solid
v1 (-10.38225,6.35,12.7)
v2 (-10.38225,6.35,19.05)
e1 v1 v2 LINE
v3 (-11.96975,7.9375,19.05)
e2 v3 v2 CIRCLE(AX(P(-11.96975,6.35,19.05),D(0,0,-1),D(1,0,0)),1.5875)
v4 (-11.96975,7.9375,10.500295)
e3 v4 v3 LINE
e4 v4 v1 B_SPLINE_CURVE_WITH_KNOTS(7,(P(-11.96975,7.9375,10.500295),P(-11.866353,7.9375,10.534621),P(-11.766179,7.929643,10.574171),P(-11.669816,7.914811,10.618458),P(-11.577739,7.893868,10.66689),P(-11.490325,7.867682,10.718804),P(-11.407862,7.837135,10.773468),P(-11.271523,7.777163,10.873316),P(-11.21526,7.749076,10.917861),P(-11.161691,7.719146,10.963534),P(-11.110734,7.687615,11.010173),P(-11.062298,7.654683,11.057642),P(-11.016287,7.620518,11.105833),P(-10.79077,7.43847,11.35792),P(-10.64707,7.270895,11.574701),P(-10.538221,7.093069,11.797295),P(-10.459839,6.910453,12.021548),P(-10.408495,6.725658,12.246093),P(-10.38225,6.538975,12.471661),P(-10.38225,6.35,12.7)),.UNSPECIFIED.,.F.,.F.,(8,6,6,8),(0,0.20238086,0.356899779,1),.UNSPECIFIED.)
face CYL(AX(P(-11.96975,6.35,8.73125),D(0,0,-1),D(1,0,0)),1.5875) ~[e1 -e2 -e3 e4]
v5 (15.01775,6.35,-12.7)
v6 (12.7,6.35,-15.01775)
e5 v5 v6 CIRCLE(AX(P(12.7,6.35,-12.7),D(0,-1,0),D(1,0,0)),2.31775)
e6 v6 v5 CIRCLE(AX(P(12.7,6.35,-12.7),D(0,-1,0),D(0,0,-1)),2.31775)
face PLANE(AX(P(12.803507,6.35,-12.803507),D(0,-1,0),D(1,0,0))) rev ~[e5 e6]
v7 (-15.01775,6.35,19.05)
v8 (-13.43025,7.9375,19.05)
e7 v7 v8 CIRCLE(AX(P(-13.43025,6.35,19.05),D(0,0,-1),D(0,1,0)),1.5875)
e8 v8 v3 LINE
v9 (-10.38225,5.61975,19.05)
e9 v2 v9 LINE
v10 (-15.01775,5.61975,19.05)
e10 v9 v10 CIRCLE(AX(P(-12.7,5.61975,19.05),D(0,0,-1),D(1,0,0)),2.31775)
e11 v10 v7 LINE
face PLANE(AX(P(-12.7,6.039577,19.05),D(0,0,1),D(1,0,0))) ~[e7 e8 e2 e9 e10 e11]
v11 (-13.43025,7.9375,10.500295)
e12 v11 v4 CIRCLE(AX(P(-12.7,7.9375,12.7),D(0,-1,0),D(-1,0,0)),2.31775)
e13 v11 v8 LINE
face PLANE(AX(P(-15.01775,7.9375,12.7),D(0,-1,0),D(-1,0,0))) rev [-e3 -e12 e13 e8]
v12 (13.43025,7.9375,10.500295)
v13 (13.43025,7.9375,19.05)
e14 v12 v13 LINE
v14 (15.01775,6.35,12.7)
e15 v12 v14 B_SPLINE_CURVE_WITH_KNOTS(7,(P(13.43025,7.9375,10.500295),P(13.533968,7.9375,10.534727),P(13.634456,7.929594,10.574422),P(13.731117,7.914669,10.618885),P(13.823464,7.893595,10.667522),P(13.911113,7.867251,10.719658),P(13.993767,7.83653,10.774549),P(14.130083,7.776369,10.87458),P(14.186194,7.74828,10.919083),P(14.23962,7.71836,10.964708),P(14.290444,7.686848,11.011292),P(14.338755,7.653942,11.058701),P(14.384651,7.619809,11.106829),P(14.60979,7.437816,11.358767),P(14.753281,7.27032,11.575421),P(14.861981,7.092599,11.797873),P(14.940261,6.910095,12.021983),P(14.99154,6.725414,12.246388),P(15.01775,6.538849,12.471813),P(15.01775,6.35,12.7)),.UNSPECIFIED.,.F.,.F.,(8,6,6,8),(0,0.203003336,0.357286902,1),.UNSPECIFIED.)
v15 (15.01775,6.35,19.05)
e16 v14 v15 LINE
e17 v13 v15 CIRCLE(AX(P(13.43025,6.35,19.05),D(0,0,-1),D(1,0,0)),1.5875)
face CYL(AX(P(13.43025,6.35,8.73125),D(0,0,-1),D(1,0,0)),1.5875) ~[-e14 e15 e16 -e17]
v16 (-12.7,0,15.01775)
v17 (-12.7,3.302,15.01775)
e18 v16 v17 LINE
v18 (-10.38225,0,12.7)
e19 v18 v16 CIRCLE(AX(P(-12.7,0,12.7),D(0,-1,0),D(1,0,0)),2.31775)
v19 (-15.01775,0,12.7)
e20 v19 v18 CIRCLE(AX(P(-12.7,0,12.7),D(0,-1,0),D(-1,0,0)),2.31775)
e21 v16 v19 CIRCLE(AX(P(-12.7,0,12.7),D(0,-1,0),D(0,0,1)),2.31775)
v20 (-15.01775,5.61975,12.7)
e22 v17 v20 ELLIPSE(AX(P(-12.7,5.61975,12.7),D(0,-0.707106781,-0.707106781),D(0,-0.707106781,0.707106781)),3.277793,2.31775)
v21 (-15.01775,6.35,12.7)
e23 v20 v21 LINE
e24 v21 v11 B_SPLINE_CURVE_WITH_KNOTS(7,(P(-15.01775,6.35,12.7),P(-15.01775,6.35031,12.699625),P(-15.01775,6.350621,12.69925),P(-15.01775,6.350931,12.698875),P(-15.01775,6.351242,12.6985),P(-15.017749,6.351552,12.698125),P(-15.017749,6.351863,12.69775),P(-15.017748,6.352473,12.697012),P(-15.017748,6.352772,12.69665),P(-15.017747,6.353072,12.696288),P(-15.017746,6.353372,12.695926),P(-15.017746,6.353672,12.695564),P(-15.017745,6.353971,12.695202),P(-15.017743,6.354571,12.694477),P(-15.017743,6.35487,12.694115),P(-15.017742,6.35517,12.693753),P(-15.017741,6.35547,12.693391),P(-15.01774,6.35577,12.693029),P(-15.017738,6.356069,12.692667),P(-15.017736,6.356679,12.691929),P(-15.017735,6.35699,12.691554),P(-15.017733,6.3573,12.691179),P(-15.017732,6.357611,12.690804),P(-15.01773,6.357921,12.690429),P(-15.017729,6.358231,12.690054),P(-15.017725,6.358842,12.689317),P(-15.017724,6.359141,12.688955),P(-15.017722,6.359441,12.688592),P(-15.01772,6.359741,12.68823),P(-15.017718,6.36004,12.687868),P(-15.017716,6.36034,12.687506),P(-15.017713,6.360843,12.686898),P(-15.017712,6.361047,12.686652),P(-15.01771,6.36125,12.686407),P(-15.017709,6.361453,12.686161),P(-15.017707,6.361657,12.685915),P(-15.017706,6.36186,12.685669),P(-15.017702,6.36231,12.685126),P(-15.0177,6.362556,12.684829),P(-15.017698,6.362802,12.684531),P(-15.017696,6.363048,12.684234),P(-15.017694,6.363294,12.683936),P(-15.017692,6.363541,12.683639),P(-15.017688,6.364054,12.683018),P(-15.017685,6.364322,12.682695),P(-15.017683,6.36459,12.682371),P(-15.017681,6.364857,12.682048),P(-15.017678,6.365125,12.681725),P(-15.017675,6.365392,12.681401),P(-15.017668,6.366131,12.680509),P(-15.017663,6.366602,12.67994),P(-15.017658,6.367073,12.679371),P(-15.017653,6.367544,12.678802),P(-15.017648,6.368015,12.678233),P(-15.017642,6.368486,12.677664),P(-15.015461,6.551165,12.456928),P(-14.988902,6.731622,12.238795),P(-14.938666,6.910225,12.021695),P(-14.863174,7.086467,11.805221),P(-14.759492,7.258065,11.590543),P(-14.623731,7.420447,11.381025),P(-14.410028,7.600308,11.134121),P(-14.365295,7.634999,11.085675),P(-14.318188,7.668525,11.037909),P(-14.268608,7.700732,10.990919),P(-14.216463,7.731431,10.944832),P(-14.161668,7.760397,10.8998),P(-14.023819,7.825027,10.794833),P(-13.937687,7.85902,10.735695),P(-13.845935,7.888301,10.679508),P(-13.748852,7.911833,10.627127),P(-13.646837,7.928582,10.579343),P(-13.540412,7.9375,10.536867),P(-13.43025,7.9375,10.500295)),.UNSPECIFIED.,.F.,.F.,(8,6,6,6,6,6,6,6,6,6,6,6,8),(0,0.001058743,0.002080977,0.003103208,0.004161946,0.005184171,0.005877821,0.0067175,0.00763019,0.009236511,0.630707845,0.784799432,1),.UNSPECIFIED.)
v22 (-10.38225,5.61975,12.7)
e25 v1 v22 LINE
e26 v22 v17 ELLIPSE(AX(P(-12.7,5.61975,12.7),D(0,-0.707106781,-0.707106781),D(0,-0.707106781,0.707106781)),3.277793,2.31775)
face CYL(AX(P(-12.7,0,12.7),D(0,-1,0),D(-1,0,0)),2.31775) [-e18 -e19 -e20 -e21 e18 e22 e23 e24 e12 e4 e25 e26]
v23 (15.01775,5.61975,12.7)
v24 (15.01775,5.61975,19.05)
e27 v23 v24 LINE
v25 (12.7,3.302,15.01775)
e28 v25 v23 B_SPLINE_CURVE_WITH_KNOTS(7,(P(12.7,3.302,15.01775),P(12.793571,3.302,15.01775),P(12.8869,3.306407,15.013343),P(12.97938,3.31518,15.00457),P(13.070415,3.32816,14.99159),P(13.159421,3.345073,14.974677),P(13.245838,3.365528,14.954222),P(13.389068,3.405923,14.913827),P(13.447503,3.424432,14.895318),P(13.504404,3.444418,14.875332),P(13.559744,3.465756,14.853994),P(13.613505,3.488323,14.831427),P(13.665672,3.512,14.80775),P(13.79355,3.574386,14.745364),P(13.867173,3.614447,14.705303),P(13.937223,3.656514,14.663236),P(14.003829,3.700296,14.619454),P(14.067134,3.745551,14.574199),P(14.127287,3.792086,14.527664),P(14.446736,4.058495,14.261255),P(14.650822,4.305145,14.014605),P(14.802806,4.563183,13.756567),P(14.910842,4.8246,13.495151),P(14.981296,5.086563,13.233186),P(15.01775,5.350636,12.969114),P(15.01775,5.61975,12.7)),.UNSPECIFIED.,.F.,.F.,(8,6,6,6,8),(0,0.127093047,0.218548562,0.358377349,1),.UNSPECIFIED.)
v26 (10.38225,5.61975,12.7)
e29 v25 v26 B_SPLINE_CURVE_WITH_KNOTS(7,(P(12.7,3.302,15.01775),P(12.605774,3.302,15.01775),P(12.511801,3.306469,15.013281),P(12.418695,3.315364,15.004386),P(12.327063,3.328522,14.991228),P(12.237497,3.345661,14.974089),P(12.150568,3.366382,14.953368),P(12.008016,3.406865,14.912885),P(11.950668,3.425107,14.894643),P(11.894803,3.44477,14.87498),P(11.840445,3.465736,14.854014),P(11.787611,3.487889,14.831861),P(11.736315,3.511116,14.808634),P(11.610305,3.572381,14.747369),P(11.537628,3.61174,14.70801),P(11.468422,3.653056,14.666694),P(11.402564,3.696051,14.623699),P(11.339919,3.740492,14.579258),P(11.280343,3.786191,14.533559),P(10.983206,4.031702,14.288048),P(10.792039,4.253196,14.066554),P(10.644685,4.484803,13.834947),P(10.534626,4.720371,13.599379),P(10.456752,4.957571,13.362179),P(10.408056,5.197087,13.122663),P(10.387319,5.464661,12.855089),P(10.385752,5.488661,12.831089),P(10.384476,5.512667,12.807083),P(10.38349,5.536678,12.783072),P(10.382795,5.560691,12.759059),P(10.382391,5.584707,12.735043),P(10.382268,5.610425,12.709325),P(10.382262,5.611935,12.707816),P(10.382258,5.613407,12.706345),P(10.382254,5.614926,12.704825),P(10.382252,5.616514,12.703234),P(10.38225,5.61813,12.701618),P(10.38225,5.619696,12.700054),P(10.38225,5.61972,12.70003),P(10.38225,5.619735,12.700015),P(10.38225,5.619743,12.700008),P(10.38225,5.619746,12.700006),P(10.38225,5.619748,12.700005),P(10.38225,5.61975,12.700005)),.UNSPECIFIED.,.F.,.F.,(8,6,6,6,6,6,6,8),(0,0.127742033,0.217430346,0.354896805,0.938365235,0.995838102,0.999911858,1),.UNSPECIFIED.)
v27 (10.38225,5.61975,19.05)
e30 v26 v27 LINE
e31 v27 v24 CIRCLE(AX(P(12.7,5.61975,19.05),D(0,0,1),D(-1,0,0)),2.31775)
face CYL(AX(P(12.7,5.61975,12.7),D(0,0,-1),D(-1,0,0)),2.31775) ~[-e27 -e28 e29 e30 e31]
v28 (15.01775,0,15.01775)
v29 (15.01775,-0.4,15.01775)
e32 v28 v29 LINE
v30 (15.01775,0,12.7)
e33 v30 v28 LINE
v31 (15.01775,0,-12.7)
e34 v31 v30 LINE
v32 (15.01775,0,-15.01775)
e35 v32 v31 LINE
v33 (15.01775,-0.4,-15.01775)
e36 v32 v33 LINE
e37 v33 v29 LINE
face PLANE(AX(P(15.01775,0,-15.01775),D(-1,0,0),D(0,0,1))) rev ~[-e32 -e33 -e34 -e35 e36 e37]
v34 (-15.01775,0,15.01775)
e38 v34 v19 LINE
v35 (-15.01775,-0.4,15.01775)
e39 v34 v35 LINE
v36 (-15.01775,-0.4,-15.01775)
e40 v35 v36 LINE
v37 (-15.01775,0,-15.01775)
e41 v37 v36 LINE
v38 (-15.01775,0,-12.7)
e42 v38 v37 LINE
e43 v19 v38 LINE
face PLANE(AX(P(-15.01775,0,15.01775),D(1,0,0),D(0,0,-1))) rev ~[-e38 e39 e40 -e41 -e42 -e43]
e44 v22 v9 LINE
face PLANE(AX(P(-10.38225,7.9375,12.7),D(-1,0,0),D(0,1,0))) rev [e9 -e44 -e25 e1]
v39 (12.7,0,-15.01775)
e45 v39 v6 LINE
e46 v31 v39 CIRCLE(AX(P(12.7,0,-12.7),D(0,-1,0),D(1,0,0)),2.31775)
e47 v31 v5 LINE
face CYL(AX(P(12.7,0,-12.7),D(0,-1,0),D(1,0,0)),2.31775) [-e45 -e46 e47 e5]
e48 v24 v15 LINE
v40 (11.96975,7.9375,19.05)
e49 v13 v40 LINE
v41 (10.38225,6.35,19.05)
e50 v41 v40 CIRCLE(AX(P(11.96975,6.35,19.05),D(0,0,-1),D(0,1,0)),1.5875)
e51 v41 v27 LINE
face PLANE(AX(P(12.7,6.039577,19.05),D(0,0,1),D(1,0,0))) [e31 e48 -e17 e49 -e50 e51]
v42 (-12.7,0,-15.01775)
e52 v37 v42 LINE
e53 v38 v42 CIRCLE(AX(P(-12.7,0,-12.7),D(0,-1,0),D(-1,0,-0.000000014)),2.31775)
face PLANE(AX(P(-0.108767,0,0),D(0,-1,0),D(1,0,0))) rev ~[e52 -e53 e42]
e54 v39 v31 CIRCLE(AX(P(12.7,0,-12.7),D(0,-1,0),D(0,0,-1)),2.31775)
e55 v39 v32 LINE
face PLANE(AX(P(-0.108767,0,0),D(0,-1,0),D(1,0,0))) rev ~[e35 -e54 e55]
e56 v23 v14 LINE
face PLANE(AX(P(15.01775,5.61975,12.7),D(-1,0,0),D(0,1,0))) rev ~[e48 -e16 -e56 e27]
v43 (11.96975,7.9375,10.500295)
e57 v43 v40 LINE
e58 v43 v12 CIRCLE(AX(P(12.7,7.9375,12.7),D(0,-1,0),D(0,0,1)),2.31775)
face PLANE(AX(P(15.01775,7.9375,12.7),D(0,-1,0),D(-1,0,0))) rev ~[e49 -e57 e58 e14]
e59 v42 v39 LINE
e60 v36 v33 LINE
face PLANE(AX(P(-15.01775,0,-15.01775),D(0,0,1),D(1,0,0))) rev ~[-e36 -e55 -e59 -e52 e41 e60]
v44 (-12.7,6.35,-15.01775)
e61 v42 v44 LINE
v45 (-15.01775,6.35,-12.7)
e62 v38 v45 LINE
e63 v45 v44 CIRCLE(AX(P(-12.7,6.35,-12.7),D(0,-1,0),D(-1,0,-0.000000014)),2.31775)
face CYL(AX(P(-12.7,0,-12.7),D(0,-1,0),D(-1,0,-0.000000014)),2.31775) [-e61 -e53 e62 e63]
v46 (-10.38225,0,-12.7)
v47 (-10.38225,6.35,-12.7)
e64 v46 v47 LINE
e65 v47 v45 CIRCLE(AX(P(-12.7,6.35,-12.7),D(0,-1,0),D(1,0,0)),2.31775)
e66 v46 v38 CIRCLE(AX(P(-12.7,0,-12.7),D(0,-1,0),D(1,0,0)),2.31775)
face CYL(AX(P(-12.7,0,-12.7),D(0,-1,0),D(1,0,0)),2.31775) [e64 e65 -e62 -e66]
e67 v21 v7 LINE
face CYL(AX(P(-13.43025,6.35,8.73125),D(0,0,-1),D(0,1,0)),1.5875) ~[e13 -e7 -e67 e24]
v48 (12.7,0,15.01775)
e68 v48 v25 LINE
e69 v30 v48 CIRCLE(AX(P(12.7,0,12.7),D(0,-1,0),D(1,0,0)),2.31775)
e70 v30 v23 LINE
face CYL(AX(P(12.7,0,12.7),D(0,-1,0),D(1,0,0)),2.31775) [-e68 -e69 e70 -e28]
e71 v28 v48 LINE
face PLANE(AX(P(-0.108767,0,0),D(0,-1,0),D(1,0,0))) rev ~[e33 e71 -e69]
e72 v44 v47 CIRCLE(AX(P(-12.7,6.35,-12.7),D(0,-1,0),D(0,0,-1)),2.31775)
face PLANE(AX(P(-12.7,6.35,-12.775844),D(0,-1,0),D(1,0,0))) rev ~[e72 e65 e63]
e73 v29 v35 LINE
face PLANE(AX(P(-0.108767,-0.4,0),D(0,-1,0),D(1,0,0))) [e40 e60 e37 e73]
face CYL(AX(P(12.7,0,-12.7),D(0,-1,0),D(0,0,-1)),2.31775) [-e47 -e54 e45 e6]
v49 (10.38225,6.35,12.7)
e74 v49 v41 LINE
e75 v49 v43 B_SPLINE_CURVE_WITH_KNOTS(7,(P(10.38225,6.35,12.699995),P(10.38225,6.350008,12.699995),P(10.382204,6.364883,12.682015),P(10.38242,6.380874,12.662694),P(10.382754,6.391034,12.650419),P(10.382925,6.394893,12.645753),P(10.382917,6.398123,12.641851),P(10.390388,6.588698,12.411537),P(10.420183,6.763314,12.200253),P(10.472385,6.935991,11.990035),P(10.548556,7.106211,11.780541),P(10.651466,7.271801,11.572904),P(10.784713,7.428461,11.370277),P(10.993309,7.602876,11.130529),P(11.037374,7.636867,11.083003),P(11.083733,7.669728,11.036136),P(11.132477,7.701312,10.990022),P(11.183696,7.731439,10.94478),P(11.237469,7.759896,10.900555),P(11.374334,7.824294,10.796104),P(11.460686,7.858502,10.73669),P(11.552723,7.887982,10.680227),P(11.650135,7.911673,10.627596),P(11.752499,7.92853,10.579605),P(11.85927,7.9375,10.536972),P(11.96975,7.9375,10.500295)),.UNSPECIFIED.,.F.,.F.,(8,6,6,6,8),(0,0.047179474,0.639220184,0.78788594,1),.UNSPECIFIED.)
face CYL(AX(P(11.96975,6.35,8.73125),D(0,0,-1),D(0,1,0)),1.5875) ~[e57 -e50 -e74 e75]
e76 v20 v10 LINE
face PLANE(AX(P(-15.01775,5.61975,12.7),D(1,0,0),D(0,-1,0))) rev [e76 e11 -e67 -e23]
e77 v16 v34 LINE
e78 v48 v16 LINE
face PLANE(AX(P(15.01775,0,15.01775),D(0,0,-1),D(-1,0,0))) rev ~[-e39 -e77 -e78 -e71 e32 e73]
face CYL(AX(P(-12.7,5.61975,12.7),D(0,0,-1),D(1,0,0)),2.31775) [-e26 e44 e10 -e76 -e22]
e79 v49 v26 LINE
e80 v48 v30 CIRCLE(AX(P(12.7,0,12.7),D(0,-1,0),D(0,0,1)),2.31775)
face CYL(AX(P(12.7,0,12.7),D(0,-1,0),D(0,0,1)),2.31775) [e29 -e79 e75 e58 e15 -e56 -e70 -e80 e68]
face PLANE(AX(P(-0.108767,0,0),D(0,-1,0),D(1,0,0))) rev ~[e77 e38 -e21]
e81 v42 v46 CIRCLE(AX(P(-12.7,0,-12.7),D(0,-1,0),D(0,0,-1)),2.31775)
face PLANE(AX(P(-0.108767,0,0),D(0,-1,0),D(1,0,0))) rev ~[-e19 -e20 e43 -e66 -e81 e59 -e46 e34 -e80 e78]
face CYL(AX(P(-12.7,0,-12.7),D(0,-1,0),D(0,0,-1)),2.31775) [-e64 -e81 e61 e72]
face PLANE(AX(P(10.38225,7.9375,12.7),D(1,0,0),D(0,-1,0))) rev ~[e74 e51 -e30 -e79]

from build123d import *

# Parameters (mm, degrees)
F1_DEPTH    = 0.4
F2_DEPTH    = 6.35
F4_DEPTH    = 7.9375
F6_DEPTH    = 6.35
F7_T1_DEPTH = 14.2875


# Not quite as in the source:
# - a fillet or chamfer that OpenCascade refuses, or shapes differently, is made with other operations: its cross-section is extruded or revolved along the edge and cut away or added
# - a pattern or mirror of a feature is missing from the dataset's text; its kind, count and spacing are read off the source's solid


with BuildPart() as f1:
    # F0 (on Front) → F1 (new body)
    with BuildSketch(Plane.XZ):
        with BuildLine():
            ThreePointArc((-12.7, 15.01775), (-11.0611032579, 14.3388967421), (-10.38225, 12.7))
            ThreePointArc((-10.38225, 12.7), (-12.7, 10.38225), (-15.01775, 12.7))
            Line((-15.01775, 12.7), (-15.01775, -12.7000000336))
            ThreePointArc((-15.01775, -12.7000000336), (-12.7000000168, -10.38225), (-10.38225, -12.7))
            ThreePointArc((-10.38225, -12.7), (-11.0611032579, -14.3388967421), (-12.7, -15.01775))
            Line((-12.7, -15.01775), (12.7, -15.01775))
            ThreePointArc((12.7, -15.01775), (11.0611032579, -11.0611032579), (15.01775, -12.7))
            Line((15.01775, -12.7), (15.01775, 12.7))
            ThreePointArc((15.01775, 12.7), (11.0611032579, 11.0611032579), (12.7, 15.01775))
            Line((12.7, 15.01775), (-12.7, 15.01775))
        make_face()
        with BuildLine():
            ThreePointArc((-10.38225, -12.7), (-12.7000000168, -10.38225), (-15.01775, -12.7000000336))
            ThreePointArc((-15.01775, -12.7000000336), (-14.3388967302, -14.338896754), (-12.7, -15.01775))
            ThreePointArc((-12.7, -15.01775), (-11.0611032579, -14.3388967421), (-10.38225, -12.7))
        make_face()
        with BuildLine():
            ThreePointArc((-15.01775, 12.7), (-12.7, 10.38225), (-10.38225, 12.7))
            ThreePointArc((-10.38225, 12.7), (-11.0611032579, 14.3388967421), (-12.7, 15.01775))
            ThreePointArc((-12.7, 15.01775), (-14.3388967421, 14.3388967421), (-15.01775, 12.7))
        make_face()
        with BuildLine():
            ThreePointArc((15.01775, 12.7), (14.3388967421, 14.3388967421), (12.7, 15.01775))
            ThreePointArc((12.7, 15.01775), (11.0611032579, 11.0611032579), (15.01775, 12.7))
        make_face()
        with BuildLine():
            ThreePointArc((12.7, -15.01775), (14.3388967421, -14.3388967421), (15.01775, -12.7))
            ThreePointArc((15.01775, -12.7), (11.0611032579, -11.0611032579), (12.7, -15.01775))
        make_face()
        with BuildLine():
            ThreePointArc((-15.01775, 12.7), (-14.3388967421, 14.3388967421), (-12.7, 15.01775))
            Line((-12.7, 15.01775), (-15.01775, 15.01775))
            Line((-15.01775, 15.01775), (-15.01775, 12.7))
        make_face()
        with BuildLine():
            Line((15.01775, 15.01775), (12.7, 15.01775))
            ThreePointArc((12.7, 15.01775), (14.3388967421, 14.3388967421), (15.01775, 12.7))
            Line((15.01775, 12.7), (15.01775, 15.01775))
        make_face()
        with BuildLine():
            Line((15.01775, -15.01775), (15.01775, -12.7))
            ThreePointArc((15.01775, -12.7), (14.3388967421, -14.3388967421), (12.7, -15.01775))
            Line((12.7, -15.01775), (15.01775, -15.01775))
        make_face()
        with BuildLine():
            ThreePointArc((-12.7, -15.01775), (-14.3388967302, -14.338896754), (-15.01775, -12.7000000336))
            Line((-15.01775, -12.7000000336), (-15.01775, -15.01775))
            Line((-15.01775, -15.01775), (-12.7, -15.01775))
        make_face()
    extrude(amount=F1_DEPTH)

    # F0 (on Front) → F2 (join)
    with BuildSketch(Plane.XZ):
        with BuildLine():
            ThreePointArc((-15.01775, 12.7), (-12.7, 10.38225), (-10.38225, 12.7))
            ThreePointArc((-10.38225, 12.7), (-11.0611032579, 14.3388967421), (-12.7, 15.01775))
            ThreePointArc((-12.7, 15.01775), (-14.3388967421, 14.3388967421), (-15.01775, 12.7))
        make_face()
        with BuildLine():
            ThreePointArc((-10.38225, -12.7), (-12.7000000168, -10.38225), (-15.01775, -12.7000000336))
            ThreePointArc((-15.01775, -12.7000000336), (-14.3388967302, -14.338896754), (-12.7, -15.01775))
            ThreePointArc((-12.7, -15.01775), (-11.0611032579, -14.3388967421), (-10.38225, -12.7))
        make_face()
        with BuildLine():
            ThreePointArc((12.7, -15.01775), (14.3388967421, -14.3388967421), (15.01775, -12.7))
            ThreePointArc((15.01775, -12.7), (11.0611032579, -11.0611032579), (12.7, -15.01775))
        make_face()
    extrude(amount=-F2_DEPTH)

    # F0 (on Front) → F4 (join)
    with BuildSketch(Plane.XZ):
        with BuildLine():
            ThreePointArc((-15.01775, 12.7), (-12.7, 10.38225), (-10.38225, 12.7))
            ThreePointArc((-10.38225, 12.7), (-11.0611032579, 14.3388967421), (-12.7, 15.01775))
            ThreePointArc((-12.7, 15.01775), (-14.3388967421, 14.3388967421), (-15.01775, 12.7))
        make_face()
        with BuildLine():
            ThreePointArc((15.01775, 12.7), (14.3388967421, 14.3388967421), (12.7, 15.01775))
            ThreePointArc((12.7, 15.01775), (11.0611032579, 11.0611032579), (15.01775, 12.7))
        make_face()
    extrude(amount=-F4_DEPTH)

    # F5 (on plane+point) → F6 (join)
    with BuildSketch(Plane.XY.offset(12.7)):
        with BuildLine():
            Line((15.01775, 5.61975), (15.01775, 7.9375))
            Line((15.01775, 7.9375), (10.38225, 7.9375))
            Line((10.38225, 7.9375), (10.38225, 5.61975))
            ThreePointArc((10.38225, 5.61975), (12.7, 3.302), (15.01775, 5.61975))
        make_face()
    f6 = extrude(amount=F6_DEPTH)

    # F6_copies: F6 across plane
    add(f6.mirror(Plane(origin=(0, 0, 0), x_dir=(0, 0, -1), z_dir=(-1, 0, 0))))

    # F7: fillet of radius 1.5875 on 4 edges, made by hand

    # F7_s2 → F7_t1 (cut)
    with BuildSketch(Plane.XY.offset(8.73125)):
        with BuildLine():
            ThreePointArc((15.01775, 6.35), (14.5527820151, 7.4725320151), (13.43025, 7.9375))
            Line((13.43025, 7.9375), (15.01775, 7.9375))
            Line((15.01775, 7.9375), (15.01775, 6.35))
        make_face()
        with BuildLine():
            ThreePointArc((11.96975, 7.9375), (10.8472179849, 7.4725320151), (10.38225, 6.35))
            Line((10.38225, 6.35), (10.38225, 7.9375))
            Line((10.38225, 7.9375), (11.96975, 7.9375))
        make_face()
        with BuildLine():
            ThreePointArc((-10.38225, 6.35), (-10.8472179849, 7.4725320151), (-11.96975, 7.9375))
            Line((-11.96975, 7.9375), (-10.38225, 7.9375))
            Line((-10.38225, 7.9375), (-10.38225, 6.35))
        make_face()
        with BuildLine():
            ThreePointArc((-13.43025, 7.9375), (-14.5527820151, 7.4725320151), (-15.01775, 6.35))
            Line((-15.01775, 6.35), (-15.01775, 7.9375))
            Line((-15.01775, 7.9375), (-13.43025, 7.9375))
        make_face()
    extrude(amount=F7_T1_DEPTH, mode=Mode.SUBTRACT)


solid = f1.part
